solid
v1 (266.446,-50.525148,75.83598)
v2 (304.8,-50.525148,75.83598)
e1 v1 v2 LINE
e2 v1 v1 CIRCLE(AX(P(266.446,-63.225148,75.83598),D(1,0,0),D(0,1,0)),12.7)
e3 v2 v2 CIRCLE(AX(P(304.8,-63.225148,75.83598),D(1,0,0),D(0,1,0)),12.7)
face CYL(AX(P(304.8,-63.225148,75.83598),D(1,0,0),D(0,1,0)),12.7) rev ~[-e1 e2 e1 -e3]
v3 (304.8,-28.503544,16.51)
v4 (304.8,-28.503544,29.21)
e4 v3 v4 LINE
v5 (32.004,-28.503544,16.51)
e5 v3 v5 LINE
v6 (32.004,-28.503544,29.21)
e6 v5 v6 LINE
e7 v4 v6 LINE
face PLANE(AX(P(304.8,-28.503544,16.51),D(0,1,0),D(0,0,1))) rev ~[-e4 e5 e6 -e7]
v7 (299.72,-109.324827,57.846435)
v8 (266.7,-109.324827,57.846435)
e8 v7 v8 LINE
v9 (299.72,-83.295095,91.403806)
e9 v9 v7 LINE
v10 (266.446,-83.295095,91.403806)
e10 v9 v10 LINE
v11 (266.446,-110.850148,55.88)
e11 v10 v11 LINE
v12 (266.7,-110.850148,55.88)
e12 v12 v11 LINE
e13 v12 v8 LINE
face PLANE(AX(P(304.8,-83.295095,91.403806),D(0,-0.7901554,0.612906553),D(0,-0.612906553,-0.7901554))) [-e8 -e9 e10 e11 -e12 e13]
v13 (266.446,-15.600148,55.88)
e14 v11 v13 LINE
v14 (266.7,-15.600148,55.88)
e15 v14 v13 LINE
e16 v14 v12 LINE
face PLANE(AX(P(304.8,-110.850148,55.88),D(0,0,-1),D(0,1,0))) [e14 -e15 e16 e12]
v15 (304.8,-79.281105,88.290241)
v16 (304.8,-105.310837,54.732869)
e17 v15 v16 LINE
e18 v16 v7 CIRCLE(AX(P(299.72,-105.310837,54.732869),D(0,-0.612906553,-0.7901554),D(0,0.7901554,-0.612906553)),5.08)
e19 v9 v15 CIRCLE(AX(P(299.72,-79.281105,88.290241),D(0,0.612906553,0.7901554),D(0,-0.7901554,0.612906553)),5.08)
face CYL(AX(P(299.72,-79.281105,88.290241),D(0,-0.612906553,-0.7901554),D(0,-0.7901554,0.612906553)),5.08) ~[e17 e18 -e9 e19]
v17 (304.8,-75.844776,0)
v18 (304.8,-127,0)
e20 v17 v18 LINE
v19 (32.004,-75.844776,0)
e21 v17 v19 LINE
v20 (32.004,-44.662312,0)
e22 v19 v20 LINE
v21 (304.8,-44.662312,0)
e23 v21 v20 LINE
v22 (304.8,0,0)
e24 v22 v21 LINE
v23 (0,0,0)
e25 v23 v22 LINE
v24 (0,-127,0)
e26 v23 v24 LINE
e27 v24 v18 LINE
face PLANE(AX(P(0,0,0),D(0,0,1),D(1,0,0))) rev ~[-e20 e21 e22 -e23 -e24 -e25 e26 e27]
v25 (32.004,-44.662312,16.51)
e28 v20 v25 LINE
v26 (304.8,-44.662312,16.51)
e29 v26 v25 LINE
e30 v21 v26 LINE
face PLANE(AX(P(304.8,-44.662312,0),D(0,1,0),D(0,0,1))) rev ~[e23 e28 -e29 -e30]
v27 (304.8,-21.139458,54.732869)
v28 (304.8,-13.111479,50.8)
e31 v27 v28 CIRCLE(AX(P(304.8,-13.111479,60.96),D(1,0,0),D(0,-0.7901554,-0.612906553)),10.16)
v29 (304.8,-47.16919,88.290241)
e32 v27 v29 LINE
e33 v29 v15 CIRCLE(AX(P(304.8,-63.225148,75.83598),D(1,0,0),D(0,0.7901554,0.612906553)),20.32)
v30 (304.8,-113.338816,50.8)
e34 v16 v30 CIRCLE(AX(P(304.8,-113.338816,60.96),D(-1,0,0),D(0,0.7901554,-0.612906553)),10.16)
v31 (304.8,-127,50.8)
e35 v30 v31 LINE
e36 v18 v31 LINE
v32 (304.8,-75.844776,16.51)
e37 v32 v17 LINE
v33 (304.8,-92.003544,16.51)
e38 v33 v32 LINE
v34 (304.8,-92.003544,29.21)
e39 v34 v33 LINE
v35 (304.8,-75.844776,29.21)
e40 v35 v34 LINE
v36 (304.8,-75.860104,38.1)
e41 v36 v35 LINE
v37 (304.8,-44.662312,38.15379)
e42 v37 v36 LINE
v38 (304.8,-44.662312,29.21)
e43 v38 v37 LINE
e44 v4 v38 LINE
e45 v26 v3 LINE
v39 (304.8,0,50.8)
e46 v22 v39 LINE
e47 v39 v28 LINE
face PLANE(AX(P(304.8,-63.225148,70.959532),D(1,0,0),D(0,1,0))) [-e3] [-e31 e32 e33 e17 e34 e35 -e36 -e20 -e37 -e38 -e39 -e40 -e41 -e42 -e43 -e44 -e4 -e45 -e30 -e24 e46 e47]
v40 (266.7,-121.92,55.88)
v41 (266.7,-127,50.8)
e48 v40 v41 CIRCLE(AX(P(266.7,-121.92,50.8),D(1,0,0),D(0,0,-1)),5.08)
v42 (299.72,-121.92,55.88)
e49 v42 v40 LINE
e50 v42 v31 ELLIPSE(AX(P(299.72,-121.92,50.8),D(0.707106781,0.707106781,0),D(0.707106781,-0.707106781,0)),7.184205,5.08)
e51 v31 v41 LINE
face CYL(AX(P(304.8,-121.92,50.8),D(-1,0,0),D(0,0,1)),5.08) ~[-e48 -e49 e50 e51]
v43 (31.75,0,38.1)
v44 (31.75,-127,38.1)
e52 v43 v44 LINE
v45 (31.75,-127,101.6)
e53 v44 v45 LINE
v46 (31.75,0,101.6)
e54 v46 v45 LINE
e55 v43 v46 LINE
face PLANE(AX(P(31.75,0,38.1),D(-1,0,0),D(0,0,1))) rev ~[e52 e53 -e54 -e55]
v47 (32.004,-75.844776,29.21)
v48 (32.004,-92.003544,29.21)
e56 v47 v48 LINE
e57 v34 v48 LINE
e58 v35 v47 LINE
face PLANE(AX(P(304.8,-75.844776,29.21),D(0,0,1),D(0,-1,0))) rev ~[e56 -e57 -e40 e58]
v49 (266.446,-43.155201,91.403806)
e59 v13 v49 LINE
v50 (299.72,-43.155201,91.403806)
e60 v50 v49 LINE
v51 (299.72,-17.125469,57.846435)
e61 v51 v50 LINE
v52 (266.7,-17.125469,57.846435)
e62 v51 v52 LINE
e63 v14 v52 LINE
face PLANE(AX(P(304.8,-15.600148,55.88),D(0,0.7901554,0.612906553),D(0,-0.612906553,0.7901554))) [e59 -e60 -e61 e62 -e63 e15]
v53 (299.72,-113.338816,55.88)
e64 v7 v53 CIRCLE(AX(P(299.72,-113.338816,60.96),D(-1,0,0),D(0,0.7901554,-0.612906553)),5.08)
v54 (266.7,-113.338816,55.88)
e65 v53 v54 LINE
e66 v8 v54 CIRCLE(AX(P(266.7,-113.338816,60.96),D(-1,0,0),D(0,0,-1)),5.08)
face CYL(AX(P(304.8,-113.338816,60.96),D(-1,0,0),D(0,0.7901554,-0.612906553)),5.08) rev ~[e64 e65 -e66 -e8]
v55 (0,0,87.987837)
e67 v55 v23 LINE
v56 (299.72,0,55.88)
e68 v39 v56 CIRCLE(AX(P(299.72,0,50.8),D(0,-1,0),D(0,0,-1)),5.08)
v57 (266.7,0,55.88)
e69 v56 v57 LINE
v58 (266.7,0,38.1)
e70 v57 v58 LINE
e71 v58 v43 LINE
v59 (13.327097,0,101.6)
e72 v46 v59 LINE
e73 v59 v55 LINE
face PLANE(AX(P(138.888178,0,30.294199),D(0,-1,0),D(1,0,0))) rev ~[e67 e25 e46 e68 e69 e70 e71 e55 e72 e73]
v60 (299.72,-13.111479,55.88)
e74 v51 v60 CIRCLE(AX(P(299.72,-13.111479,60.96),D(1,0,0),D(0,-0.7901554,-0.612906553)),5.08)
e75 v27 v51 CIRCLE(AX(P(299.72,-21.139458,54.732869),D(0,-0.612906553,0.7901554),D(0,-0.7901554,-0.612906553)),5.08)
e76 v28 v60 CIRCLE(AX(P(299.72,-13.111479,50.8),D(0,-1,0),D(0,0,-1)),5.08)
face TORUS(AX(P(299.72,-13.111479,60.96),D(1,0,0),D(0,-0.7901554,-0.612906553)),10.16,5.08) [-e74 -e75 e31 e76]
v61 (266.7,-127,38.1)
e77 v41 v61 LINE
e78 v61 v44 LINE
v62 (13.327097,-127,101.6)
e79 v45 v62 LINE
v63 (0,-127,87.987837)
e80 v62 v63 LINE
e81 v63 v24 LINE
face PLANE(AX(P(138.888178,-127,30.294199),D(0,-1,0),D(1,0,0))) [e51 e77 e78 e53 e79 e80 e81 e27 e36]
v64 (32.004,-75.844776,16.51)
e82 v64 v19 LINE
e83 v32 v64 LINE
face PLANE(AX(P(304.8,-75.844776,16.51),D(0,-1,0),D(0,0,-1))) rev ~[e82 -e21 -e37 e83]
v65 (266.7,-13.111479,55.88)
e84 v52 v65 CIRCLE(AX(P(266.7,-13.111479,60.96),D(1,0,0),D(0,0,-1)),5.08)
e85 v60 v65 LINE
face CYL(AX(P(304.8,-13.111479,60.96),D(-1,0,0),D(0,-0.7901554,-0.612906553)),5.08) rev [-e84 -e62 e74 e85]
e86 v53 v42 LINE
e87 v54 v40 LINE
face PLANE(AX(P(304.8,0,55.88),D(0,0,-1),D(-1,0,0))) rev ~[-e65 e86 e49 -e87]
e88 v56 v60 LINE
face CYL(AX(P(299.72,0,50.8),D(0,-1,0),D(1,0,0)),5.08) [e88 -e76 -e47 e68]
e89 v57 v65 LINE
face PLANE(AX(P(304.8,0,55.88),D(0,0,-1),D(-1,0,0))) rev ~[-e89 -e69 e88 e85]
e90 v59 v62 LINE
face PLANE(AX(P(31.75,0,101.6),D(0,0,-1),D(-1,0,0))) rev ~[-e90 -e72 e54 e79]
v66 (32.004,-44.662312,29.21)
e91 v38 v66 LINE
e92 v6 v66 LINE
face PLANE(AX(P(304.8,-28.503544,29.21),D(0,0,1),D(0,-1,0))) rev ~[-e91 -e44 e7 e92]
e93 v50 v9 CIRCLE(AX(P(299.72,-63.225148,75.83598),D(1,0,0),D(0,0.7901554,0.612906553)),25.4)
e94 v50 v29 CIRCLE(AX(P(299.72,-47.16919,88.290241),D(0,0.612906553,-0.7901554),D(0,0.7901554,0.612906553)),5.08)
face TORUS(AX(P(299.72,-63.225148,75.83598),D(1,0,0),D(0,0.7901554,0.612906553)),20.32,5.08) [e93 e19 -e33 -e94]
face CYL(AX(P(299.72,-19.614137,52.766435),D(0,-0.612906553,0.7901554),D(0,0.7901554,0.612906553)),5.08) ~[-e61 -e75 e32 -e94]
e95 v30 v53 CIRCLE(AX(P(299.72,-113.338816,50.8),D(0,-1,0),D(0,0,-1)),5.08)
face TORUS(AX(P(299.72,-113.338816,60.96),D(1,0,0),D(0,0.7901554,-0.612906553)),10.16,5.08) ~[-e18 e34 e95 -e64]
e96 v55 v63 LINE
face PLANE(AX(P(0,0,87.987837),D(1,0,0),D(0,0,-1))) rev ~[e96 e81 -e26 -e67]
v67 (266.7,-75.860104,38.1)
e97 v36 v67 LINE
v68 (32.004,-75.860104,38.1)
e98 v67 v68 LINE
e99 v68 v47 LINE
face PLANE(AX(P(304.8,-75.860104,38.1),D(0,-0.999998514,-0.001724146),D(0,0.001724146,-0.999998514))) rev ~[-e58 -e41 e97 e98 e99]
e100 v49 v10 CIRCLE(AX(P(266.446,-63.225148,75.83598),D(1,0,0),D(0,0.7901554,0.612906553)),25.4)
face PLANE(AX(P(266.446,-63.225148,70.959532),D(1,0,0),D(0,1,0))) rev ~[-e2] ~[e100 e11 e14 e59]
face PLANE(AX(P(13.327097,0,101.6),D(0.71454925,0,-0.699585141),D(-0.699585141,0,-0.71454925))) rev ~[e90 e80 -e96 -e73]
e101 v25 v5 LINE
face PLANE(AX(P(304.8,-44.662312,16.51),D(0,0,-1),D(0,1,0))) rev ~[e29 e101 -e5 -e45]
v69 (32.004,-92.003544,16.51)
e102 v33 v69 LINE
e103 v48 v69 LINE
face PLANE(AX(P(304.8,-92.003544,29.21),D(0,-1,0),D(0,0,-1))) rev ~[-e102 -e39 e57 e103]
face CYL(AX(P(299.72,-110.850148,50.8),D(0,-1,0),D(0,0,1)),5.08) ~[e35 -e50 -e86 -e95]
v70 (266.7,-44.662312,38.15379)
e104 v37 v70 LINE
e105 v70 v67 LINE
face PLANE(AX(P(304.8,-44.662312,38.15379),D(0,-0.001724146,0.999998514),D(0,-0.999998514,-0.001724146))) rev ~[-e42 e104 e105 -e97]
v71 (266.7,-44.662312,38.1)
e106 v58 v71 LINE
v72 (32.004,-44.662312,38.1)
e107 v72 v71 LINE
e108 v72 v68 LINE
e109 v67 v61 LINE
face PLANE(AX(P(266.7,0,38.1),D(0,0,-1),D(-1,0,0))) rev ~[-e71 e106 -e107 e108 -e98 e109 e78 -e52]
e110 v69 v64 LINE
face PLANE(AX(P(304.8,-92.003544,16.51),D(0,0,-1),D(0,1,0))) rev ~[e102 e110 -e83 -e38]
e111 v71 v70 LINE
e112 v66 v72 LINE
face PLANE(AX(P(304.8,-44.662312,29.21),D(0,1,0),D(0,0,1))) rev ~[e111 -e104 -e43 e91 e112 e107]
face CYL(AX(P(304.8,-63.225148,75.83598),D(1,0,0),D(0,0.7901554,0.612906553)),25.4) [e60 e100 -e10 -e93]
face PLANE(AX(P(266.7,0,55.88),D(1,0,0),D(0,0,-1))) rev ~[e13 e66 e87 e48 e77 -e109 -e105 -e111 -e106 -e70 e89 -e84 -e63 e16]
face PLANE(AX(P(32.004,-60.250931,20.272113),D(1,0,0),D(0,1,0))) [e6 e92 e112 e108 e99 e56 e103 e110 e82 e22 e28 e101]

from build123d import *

# Parameters (mm, degrees)
F1_DEPTH = 127
F3_DEPTH = 38.354
F4_R     = 12.7
F5_DEPTH = 63.5
F7_DEPTH = 272.796
F8_R     = 5.08


with BuildPart() as f1:
    # F0 (on Front) → F1 (new body)
    with BuildSketch(Plane.XZ):
        Polygon((0, 87.987836793), (0, 0), (304.8, 0), (304.8, 55.88), (266.7, 55.88), (266.7, 38.1), (31.75, 38.1), (31.75, 101.6), (13.3270969392, 101.6), align=None)
    extrude(amount=F1_DEPTH)

    # F2 (on face) → F3 (join)
    with BuildSketch(Plane.YZ.offset(304.8)):
        with BuildLine():
            Line((-83.2950948956, 91.4038064892), (-110.8501477266, 55.88))
            Line((-110.8501477266, 55.88), (-15.6001477266, 55.88))
            Line((-15.6001477266, 55.88), (-43.1552005575, 91.4038064892))
            ThreePointArc((-43.1552005575, 91.4038064892), (-63.2251477266, 101.2359800311), (-83.2950948956, 91.4038064892))
        make_face()
    extrude(amount=-F3_DEPTH)

    # F4 (on face) → F5 (cut, symmetric)
    with BuildSketch(Plane.YZ.offset(304.8)):
        with Locations((-63.2251477266, 75.8359800311)):
            Circle(F4_R)
    extrude(amount=F5_DEPTH, both=True, mode=Mode.SUBTRACT)

    # F6 (on face) → F7 (cut)
    with BuildSketch(Plane.YZ.offset(304.8)):
        Polygon((-75.8447764756, 16.51), (-75.8447764756, 0), (-44.662312481, 0), (-44.662312481, 16.51), (-28.5035444783, 16.51), (-28.5035444783, 29.21), (-44.662312481, 29.21), (-44.662312481, 38.1537896351), (-75.8601041585, 38.1), (-75.8447764756, 29.21), (-92.0035444783, 29.21), (-92.0035444783, 16.51), align=None)
    extrude(amount=-F7_DEPTH, mode=Mode.SUBTRACT)

    # F8
    f8_edges = [f1.edges().sort_by_distance(p)[0] for p in [
        (304.8, -97.072621, 73.641903),
        (304.8, -7.800074, 55.88),
        (304.8, -118.925074, 55.88),
        (285.75, -127, 55.88),
        (285.623, -83.295095, 91.403806),
        (285.623, -43.155201, 91.403806),
        (304.8, -29.377674, 73.641903),
        (304.8, -63.225148, 101.23598),
        (285.75, -15.600148, 55.88),
        (285.75, -110.850148, 55.88),
    ]]
    fillet(f8_edges, radius=F8_R)


solid = f1.part
